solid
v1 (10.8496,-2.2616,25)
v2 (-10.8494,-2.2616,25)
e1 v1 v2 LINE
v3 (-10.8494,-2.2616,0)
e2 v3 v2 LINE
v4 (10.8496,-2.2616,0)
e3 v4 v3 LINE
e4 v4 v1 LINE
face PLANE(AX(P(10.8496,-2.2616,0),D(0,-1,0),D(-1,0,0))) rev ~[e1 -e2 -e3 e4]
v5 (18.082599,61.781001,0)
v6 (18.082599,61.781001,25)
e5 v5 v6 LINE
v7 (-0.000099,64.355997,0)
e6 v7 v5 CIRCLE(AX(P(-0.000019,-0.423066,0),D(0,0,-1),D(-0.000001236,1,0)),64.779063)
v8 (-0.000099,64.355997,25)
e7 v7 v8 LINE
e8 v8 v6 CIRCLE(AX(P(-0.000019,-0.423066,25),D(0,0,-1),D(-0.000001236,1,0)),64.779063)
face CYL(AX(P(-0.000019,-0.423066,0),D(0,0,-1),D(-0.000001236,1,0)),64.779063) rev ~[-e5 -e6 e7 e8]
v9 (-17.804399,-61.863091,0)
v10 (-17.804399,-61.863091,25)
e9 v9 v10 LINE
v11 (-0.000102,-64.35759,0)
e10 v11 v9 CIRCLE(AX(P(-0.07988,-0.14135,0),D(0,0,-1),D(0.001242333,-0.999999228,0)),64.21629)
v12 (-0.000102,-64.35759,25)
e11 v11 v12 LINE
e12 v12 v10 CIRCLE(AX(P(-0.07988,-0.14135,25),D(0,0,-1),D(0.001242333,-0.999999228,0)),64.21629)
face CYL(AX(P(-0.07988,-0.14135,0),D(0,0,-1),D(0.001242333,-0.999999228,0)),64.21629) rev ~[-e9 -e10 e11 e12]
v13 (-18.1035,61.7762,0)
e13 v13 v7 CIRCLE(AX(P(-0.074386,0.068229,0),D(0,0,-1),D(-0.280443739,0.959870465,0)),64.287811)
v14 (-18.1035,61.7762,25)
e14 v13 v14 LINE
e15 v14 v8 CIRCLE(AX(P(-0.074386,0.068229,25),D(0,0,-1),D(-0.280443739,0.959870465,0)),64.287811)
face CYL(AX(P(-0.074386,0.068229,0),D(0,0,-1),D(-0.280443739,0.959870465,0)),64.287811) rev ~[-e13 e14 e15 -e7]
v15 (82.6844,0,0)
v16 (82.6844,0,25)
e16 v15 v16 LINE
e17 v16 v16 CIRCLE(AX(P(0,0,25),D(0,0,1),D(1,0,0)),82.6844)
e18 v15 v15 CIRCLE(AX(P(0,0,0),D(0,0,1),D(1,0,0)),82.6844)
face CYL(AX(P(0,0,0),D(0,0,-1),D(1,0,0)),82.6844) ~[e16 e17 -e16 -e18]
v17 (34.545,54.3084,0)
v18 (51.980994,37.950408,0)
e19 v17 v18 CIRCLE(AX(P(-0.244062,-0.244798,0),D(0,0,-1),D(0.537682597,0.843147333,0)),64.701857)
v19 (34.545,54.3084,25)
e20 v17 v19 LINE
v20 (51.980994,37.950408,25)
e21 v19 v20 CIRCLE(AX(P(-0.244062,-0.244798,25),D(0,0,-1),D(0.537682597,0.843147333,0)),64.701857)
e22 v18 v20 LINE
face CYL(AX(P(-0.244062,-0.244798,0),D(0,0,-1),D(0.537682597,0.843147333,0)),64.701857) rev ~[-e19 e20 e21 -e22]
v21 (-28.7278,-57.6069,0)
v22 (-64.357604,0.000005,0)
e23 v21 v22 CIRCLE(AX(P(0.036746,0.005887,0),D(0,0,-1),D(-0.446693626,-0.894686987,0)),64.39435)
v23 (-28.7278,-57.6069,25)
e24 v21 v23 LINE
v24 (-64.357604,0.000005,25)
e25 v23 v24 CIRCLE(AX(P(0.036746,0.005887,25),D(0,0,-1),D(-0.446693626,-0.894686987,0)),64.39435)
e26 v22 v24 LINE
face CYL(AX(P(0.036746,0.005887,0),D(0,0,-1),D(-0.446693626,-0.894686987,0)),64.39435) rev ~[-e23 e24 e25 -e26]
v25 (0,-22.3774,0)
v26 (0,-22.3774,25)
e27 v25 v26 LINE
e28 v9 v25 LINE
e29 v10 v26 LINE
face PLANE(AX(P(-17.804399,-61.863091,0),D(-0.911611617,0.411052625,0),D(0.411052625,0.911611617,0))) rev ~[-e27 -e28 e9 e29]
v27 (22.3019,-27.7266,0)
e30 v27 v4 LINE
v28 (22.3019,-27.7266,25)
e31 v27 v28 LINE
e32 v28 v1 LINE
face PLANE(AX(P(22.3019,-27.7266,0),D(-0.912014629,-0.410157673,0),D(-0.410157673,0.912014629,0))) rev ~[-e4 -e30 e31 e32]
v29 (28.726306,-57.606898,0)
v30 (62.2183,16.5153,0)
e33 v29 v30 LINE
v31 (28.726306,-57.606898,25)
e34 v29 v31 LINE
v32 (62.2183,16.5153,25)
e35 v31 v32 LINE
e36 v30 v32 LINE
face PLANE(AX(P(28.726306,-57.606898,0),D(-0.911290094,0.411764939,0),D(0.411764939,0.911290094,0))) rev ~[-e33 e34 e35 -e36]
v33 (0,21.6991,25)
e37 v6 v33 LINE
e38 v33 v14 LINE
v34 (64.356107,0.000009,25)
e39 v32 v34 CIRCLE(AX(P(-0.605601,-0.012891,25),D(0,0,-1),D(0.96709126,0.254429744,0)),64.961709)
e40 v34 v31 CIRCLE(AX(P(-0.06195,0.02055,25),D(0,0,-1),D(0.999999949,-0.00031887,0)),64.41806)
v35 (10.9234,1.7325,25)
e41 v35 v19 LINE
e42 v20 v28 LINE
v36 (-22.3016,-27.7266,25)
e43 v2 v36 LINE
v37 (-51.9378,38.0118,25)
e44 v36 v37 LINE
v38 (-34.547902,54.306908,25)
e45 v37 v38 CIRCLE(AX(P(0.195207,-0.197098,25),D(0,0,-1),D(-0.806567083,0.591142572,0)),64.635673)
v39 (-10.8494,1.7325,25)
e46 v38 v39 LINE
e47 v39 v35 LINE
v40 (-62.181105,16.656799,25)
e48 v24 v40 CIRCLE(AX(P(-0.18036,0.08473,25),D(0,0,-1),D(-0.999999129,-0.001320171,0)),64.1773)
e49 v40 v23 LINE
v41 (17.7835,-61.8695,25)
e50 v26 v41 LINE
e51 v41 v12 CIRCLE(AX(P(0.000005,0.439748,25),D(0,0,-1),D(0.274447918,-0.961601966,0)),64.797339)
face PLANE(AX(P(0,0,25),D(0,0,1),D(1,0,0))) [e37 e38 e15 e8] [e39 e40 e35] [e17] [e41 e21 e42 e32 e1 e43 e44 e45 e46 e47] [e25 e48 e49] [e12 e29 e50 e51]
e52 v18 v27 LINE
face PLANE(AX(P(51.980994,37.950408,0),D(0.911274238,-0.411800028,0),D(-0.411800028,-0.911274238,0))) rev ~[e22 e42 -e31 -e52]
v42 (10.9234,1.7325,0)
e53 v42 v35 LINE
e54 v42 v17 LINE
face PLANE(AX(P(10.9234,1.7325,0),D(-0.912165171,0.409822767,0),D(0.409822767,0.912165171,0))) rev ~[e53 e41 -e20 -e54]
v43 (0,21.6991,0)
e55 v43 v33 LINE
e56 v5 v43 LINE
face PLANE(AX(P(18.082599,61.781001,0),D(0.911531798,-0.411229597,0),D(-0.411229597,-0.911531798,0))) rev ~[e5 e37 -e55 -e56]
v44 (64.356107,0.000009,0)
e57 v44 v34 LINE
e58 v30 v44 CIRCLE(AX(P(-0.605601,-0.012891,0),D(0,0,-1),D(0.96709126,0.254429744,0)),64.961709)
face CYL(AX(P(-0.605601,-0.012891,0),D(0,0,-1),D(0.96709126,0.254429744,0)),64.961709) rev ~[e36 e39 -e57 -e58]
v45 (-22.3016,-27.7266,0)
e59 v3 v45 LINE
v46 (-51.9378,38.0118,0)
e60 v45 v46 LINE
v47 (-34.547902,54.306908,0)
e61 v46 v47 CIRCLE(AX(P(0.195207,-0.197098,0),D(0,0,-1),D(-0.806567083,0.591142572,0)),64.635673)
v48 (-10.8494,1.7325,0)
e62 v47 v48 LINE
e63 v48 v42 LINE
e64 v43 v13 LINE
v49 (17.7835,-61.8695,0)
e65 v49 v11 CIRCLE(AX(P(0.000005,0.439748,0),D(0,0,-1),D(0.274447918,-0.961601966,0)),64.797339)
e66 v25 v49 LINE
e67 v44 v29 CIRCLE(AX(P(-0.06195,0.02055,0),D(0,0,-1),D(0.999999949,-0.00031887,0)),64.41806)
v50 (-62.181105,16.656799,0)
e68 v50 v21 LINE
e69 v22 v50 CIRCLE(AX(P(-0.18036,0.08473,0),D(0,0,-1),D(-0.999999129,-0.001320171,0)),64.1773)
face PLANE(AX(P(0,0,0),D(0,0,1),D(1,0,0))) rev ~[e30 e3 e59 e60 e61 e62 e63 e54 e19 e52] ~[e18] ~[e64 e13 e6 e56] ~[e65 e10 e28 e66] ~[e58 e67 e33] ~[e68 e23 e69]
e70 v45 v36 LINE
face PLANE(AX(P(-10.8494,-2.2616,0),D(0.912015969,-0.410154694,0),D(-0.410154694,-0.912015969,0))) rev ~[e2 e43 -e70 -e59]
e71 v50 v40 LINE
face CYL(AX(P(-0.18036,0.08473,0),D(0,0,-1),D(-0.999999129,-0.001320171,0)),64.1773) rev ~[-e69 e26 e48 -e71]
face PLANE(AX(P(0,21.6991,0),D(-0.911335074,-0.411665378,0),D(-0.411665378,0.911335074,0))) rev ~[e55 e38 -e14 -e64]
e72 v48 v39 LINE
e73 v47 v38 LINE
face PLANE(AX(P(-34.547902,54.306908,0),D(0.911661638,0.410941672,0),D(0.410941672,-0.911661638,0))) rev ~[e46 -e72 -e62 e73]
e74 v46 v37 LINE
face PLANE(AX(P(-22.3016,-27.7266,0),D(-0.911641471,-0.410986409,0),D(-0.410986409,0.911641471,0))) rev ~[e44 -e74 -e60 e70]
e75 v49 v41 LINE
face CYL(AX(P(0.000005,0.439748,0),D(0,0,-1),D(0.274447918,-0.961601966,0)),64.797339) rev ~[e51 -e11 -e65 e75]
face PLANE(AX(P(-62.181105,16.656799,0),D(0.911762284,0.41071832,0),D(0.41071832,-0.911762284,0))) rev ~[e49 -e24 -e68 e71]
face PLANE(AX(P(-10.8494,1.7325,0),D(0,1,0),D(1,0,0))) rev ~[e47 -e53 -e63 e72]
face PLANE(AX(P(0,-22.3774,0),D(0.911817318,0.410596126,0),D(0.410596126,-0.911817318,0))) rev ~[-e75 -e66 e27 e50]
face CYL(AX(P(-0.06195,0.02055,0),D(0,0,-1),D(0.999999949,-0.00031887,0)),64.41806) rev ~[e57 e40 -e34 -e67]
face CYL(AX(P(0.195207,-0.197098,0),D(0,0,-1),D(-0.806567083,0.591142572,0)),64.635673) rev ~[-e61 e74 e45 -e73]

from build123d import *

# Parameters (mm, degrees)
F1_DEPTH = 25


# Not quite as in the source:
# - ends of sketch curves that miss each other by under 0.0002 mm in the source are joined


with BuildPart() as f1:
    # F0 (on Top) → F1 (new body)
    with BuildSketch(Plane.XY):
        with BuildLine():
            ThreePointArc((-82.6844, 0), (0, -82.6844), (82.6844, 0))
            ThreePointArc((82.6844, 0), (0, 82.6844), (-82.6844, 0))
        make_face()
        with BuildLine():
            ThreePointArc((-0.0001019994, -64.3575904446), (-8.9899783863, -63.7364917021), (-17.8043990333, -61.8630911161))
            Line((-17.8043990333, -61.8630911161), (0, -22.3774))
            Line((0, -22.3774), (17.7835, -61.8695))
            ThreePointArc((17.7835, -61.8695), (8.9783061535, -63.7325605397), (-0.0001019994, -64.3575904446))
        make_face(mode=Mode.SUBTRACT)
        with BuildLine():
            ThreePointArc((-64.3576040742, 5e-06), (-63.8166972636, 8.3999218175), (-62.181104878, 16.6567989674))
            Line((-62.181104878, 16.6567989674), (-28.7278, -57.6069))
            ThreePointArc((-28.7278, -57.6069), (-54.7289693105, -33.866650173), (-64.3576040742, 5e-06))
        make_face(mode=Mode.SUBTRACT)
        with BuildLine():
            ThreePointArc((64.356106725, 9e-06), (54.7239343065, -33.864451622), (28.7263060265, -57.6068980531))
            Line((28.7263060265, -57.6068980531), (62.2183, 16.5153))
            ThreePointArc((62.2183, 16.5153), (63.8186125658, 8.3264340159), (64.356106725, 9e-06))
        make_face(mode=Mode.SUBTRACT)
        with BuildLine():
            Line((0, 21.6991), (-18.1035, 61.7762))
            ThreePointArc((-18.1035, 61.7762), (-9.143995, 63.7130624999), (-9.9e-05, 64.355997063))
            ThreePointArc((-9.9e-05, 64.355997063), (9.132463164, 63.7090225476), (18.0825989725, 61.7810009054))
            Line((18.0825989725, 61.7810009054), (0, 21.6991))
        make_face(mode=Mode.SUBTRACT)
        with BuildLine():
            Line((10.9234, 1.7325), (34.545, 54.3084))
            ThreePointArc((34.545, 54.3084), (44.0251133087, 46.9417504609), (51.9809939632, 37.9504079731))
            Line((51.9809939632, 37.9504079731), (22.3019, -27.7266))
            Line((22.3019, -27.7266), (10.8496, -2.2616))
            Line((10.8496, -2.2616), (-10.8494, -2.2616))
            Line((-10.8494, -2.2616), (-22.3016, -27.7266))
            Line((-22.3016, -27.7266), (-51.9378, 38.0118))
            ThreePointArc((-51.9378, 38.0118), (-44.0003546147, 46.9677472651), (-34.5479019666, 54.3069079476))
            Line((-34.5479019666, 54.3069079476), (-10.8494, 1.7325))
            Line((-10.8494, 1.7325), (10.9234, 1.7325))
        make_face(mode=Mode.SUBTRACT)
    extrude(amount=F1_DEPTH)


solid = f1.part
